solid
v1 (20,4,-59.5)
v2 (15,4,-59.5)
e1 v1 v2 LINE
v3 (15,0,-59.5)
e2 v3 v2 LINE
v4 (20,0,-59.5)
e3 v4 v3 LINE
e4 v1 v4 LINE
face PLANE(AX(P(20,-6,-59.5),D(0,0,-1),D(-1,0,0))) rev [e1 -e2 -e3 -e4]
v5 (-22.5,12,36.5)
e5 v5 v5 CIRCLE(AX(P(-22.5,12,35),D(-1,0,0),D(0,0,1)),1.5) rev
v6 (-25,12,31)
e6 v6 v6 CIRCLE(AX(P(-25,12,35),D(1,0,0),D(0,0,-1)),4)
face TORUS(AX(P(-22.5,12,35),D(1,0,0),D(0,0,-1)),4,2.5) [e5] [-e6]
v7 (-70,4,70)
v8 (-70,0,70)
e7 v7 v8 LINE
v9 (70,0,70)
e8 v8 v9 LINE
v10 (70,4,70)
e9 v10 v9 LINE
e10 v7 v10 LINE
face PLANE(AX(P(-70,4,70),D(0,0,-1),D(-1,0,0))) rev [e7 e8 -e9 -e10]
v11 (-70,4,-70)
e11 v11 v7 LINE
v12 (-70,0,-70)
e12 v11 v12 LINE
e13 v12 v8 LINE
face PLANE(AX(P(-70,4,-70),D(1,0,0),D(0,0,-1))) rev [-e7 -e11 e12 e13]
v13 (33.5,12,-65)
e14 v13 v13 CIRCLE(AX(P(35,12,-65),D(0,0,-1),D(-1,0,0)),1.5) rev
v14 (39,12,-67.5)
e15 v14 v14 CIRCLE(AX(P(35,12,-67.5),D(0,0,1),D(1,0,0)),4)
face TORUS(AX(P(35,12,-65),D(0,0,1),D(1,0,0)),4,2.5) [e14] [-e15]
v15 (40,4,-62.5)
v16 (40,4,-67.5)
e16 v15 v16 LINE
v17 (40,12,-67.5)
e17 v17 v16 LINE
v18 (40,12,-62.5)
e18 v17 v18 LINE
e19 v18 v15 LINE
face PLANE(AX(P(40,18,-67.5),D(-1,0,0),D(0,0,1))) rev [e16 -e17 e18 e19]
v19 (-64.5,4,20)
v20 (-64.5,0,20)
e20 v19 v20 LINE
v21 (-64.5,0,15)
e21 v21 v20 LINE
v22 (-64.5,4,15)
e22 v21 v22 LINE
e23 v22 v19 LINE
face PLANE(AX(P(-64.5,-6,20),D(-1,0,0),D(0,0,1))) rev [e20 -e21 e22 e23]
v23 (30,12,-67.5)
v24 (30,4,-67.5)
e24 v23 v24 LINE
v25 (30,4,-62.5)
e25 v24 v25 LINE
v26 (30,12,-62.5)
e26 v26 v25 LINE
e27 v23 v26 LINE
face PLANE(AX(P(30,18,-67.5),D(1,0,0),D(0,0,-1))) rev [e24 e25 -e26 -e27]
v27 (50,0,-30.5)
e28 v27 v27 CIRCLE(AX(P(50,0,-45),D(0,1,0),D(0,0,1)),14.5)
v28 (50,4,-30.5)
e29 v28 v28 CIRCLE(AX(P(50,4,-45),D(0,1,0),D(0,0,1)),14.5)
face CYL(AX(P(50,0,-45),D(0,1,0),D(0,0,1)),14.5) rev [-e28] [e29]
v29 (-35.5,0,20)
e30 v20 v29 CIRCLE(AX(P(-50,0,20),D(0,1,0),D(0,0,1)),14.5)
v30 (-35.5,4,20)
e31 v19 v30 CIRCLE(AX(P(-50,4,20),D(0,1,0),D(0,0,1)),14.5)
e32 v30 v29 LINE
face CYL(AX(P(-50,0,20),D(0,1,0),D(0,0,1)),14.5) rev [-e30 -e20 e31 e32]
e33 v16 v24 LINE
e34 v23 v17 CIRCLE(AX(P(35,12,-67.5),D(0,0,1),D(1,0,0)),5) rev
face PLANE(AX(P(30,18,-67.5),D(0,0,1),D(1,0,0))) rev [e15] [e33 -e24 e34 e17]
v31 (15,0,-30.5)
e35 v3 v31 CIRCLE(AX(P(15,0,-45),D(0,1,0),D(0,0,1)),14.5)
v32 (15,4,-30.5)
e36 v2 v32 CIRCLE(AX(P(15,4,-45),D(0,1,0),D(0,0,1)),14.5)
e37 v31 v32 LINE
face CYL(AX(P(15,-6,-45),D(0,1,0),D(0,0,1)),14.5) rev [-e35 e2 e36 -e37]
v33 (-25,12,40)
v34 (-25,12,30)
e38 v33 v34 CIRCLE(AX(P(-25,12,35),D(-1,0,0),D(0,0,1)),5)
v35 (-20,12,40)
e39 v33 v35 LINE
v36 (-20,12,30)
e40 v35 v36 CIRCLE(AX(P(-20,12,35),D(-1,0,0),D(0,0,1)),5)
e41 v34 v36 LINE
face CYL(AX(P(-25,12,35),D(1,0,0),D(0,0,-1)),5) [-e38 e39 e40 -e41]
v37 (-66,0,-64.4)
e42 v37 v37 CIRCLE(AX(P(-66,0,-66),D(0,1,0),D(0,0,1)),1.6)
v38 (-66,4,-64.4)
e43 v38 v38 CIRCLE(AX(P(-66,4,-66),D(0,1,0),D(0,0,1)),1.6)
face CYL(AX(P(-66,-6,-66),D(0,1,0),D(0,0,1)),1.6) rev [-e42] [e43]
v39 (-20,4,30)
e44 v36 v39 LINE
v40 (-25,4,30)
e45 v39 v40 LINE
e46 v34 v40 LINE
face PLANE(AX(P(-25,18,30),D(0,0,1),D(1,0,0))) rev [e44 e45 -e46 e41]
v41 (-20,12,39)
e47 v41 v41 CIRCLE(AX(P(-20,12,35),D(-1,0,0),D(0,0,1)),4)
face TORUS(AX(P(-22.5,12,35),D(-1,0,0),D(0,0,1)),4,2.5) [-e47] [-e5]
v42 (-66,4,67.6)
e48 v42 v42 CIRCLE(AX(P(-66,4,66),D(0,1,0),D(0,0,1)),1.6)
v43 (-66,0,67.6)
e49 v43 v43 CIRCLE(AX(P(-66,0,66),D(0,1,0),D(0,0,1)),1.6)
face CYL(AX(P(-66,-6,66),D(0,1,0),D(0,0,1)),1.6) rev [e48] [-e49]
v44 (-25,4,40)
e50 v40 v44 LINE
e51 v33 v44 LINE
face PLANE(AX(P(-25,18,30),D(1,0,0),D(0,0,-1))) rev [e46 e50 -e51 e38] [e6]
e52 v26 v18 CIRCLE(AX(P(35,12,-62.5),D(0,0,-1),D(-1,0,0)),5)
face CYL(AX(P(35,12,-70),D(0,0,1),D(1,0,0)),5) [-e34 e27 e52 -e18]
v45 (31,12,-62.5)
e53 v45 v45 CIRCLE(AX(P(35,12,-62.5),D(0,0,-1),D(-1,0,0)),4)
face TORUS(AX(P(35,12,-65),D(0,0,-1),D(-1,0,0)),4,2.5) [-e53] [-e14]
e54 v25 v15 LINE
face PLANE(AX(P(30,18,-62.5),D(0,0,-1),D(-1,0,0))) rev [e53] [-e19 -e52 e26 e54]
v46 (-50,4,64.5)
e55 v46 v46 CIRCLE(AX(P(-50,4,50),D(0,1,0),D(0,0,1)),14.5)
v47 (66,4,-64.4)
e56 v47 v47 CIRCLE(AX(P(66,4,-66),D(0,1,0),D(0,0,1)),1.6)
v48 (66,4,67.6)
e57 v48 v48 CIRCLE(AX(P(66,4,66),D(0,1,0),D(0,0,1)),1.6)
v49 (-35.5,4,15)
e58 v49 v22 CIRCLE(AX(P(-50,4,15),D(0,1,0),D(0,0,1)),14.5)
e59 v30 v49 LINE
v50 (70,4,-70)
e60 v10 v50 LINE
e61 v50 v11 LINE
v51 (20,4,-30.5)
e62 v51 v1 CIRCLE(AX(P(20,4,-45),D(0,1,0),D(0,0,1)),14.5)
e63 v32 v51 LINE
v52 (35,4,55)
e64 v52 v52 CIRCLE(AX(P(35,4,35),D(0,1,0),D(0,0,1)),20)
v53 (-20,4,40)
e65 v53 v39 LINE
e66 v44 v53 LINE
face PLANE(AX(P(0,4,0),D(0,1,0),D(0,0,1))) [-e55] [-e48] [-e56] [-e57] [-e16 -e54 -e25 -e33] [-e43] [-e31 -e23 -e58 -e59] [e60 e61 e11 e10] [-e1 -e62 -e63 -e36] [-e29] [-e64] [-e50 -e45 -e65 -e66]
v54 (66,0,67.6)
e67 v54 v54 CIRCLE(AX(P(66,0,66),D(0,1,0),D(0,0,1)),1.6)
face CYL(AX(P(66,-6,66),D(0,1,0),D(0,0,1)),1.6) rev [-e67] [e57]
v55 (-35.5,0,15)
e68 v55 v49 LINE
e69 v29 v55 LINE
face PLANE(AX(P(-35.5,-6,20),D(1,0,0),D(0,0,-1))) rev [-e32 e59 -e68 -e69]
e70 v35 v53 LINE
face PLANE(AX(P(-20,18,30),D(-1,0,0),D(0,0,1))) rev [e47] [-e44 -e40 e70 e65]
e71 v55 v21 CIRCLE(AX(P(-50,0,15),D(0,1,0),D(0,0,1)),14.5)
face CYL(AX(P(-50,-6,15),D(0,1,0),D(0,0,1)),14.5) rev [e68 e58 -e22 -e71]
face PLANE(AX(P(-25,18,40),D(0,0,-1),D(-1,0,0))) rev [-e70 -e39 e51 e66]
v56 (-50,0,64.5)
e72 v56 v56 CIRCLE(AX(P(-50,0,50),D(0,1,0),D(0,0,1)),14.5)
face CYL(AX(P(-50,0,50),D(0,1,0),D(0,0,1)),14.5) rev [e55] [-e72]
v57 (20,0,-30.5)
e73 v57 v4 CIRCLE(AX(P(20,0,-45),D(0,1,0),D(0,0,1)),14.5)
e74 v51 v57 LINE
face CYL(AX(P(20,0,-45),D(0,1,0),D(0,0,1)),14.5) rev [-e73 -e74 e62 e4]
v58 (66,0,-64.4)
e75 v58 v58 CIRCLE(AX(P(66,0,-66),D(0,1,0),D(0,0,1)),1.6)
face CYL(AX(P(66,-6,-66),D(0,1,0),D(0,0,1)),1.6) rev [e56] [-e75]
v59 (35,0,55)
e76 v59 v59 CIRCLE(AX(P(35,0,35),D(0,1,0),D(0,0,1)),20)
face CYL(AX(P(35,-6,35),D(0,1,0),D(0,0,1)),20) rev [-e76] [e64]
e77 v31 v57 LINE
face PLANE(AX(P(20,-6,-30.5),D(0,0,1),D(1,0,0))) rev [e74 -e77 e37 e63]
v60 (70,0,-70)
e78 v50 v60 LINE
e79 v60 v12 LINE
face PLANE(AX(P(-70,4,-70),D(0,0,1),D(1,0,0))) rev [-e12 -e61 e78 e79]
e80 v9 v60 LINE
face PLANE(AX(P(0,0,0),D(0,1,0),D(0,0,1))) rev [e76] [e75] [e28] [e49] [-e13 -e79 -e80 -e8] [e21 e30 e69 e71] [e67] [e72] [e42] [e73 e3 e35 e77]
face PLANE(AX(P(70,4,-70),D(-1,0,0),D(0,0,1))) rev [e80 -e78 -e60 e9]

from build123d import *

# Parameters (mm, degrees)
SKETCH1_W           = 140
SKETCH1_H           = 140
BOSS_EXTRUDE1_DEPTH = 4
SKETCH2_R           = 14.5
CUT_EXTRUDE1_DEPTH  = 4
SKETCH3_R           = 20
CUT_EXTRUDE2_DEPTH  = 10
SKETCH5_R           = 1.6
CUT_EXTRUDE5_DEPTH  = 10
CUT_EXTRUDE6_DEPTH  = 10
SKETCH8_W           = 5
SKETCH8_H           = 10
SKETCH8_W_2         = 10
SKETCH8_H_2         = 5
BOSS_EXTRUDE2_DEPTH = 14
SKETCH9_R           = 1.5
CUT_EXTRUDE7_DEPTH  = 151.931275752
SKETCH10_R          = 1.5
CUT_EXTRUDE8_DEPTH  = 5
FILLET1_R           = 2.5


with BuildPart() as part:
    # Sketch1 → Boss-Extrude1 (new body)
    with BuildSketch(Plane(origin=(0, 0, 0), x_dir=(1, 0, 0), z_dir=(0, 1, 0))):
        Rectangle(SKETCH1_W, SKETCH1_H)
    extrude(amount=BOSS_EXTRUDE1_DEPTH)

    # Sketch2 → Cut-Extrude1 (cut)
    with BuildSketch(Plane(origin=(0, 4, 0), x_dir=(1, 0, 0), z_dir=(0, 1, 0))):
        with Locations(Location((50, 45, 0), (0, 0, 270))):
            Circle(SKETCH2_R)
        with Locations(Location((20, 45, 0), (0, 0, 270))):
            Circle(SKETCH2_R)
        with Locations(Location((-50, -20, 0), (0, 0, 270))):
            Circle(SKETCH2_R)
        with Locations(Location((-50, -50, 0), (0, 0, 270))):
            Circle(SKETCH2_R)
    extrude(amount=-CUT_EXTRUDE1_DEPTH, mode=Mode.SUBTRACT)

    # Sketch3 → Cut-Extrude2 (cut)
    with BuildSketch(Plane(origin=(0, 4, 0), x_dir=(1, 0, 0), z_dir=(0, 1, 0))):
        with Locations(Location((35, -35, 0), (0, 0, 270))):
            Circle(SKETCH3_R)
    extrude(amount=-CUT_EXTRUDE2_DEPTH, mode=Mode.SUBTRACT)

    # Sketch5 → Cut-Extrude5 (cut)
    with BuildSketch(Plane(origin=(0, 4, 0), x_dir=(1, 0, 0), z_dir=(0, 1, 0))):
        with Locations(Location((-66, 66, 0), (0, 0, 270))):
            Circle(SKETCH5_R)
        with Locations(Location((66, 66, 0), (0, 0, 270))):
            Circle(SKETCH5_R)
        with Locations(Location((66, -66, 0), (0, 0, 270))):
            Circle(SKETCH5_R)
        with Locations(Location((-66, -66, 0), (0, 0, 270))):
            Circle(SKETCH5_R)
    extrude(amount=-CUT_EXTRUDE5_DEPTH, mode=Mode.SUBTRACT)

    # Sketch7 → Cut-Extrude6 (cut)
    with BuildSketch(Plane(origin=(0, 4, 0), x_dir=(1, 0, 0), z_dir=(0, 1, 0))):
        with BuildLine():
            Line((-64.5, -20), (-64.5, -15))
            ThreePointArc((-64.5, -15), (-50, -0.5), (-35.5, -15))
            Line((-35.5, -15), (-35.5, -20))
            ThreePointArc((-35.5, -20), (-50, -34.5), (-64.5, -20))
        make_face()
        with BuildLine():
            Line((20, 30.5), (15, 30.5))
            ThreePointArc((15, 30.5), (0.5, 45), (15, 59.5))
            Line((15, 59.5), (20, 59.5))
            ThreePointArc((20, 59.5), (34.5, 45), (20, 30.5))
        make_face()
    extrude(amount=-CUT_EXTRUDE6_DEPTH, mode=Mode.SUBTRACT)

    # Sketch8 → Boss-Extrude2 (add)
    with BuildSketch(Plane(origin=(0, 4, 0), x_dir=(1, 0, 0), z_dir=(0, 1, 0))):
        with Locations((-22.5, -35)):
            Rectangle(SKETCH8_W, SKETCH8_H)
        with Locations((35, 65)):
            Rectangle(SKETCH8_W_2, SKETCH8_H_2)
    extrude(amount=BOSS_EXTRUDE2_DEPTH)

    # Sketch9 → Cut-Extrude7 (cut, through all)
    with BuildSketch(Plane.XY.offset(-62.5)):
        with Locations((35, 12)):
            Circle(SKETCH9_R)
        with BuildLine():
            Line((30, 12), (30, 22.099022081))
            Line((30, 22.099022081), (40, 22.099022081))
            Line((40, 22.099022081), (40, 12))
            ThreePointArc((40, 12), (35, 17), (30, 12))
        make_face()
    extrude(amount=-CUT_EXTRUDE7_DEPTH, mode=Mode.SUBTRACT)

    # Sketch10 → Cut-Extrude8 (cut)
    with BuildSketch(Plane(origin=(-20, 0, 0), x_dir=(0, 0, -1), z_dir=(1, 0, 0))):
        with Locations((-35, 12)):
            Circle(SKETCH10_R)
        with BuildLine():
            Line((-40, 12), (-40, 23.531098802))
            Line((-40, 23.531098802), (-30, 23.531098802))
            Line((-30, 23.531098802), (-30, 12))
            ThreePointArc((-30, 12), (-35, 17), (-40, 12))
        make_face()
    extrude(amount=-CUT_EXTRUDE8_DEPTH, mode=Mode.SUBTRACT)

    # Fillet1
    fillet1_edges = [part.edges().sort_by_distance(p)[0] for p in [
        (33.5, 12, -67.5),
        (33.5, 12, -62.5),
        (-25, 12, 36.5),
        (-20, 12, 36.5),
    ]]
    fillet(fillet1_edges, radius=FILLET1_R - 0.0001)  # a hair under: the kernel refuses the full size


solid = part.part
